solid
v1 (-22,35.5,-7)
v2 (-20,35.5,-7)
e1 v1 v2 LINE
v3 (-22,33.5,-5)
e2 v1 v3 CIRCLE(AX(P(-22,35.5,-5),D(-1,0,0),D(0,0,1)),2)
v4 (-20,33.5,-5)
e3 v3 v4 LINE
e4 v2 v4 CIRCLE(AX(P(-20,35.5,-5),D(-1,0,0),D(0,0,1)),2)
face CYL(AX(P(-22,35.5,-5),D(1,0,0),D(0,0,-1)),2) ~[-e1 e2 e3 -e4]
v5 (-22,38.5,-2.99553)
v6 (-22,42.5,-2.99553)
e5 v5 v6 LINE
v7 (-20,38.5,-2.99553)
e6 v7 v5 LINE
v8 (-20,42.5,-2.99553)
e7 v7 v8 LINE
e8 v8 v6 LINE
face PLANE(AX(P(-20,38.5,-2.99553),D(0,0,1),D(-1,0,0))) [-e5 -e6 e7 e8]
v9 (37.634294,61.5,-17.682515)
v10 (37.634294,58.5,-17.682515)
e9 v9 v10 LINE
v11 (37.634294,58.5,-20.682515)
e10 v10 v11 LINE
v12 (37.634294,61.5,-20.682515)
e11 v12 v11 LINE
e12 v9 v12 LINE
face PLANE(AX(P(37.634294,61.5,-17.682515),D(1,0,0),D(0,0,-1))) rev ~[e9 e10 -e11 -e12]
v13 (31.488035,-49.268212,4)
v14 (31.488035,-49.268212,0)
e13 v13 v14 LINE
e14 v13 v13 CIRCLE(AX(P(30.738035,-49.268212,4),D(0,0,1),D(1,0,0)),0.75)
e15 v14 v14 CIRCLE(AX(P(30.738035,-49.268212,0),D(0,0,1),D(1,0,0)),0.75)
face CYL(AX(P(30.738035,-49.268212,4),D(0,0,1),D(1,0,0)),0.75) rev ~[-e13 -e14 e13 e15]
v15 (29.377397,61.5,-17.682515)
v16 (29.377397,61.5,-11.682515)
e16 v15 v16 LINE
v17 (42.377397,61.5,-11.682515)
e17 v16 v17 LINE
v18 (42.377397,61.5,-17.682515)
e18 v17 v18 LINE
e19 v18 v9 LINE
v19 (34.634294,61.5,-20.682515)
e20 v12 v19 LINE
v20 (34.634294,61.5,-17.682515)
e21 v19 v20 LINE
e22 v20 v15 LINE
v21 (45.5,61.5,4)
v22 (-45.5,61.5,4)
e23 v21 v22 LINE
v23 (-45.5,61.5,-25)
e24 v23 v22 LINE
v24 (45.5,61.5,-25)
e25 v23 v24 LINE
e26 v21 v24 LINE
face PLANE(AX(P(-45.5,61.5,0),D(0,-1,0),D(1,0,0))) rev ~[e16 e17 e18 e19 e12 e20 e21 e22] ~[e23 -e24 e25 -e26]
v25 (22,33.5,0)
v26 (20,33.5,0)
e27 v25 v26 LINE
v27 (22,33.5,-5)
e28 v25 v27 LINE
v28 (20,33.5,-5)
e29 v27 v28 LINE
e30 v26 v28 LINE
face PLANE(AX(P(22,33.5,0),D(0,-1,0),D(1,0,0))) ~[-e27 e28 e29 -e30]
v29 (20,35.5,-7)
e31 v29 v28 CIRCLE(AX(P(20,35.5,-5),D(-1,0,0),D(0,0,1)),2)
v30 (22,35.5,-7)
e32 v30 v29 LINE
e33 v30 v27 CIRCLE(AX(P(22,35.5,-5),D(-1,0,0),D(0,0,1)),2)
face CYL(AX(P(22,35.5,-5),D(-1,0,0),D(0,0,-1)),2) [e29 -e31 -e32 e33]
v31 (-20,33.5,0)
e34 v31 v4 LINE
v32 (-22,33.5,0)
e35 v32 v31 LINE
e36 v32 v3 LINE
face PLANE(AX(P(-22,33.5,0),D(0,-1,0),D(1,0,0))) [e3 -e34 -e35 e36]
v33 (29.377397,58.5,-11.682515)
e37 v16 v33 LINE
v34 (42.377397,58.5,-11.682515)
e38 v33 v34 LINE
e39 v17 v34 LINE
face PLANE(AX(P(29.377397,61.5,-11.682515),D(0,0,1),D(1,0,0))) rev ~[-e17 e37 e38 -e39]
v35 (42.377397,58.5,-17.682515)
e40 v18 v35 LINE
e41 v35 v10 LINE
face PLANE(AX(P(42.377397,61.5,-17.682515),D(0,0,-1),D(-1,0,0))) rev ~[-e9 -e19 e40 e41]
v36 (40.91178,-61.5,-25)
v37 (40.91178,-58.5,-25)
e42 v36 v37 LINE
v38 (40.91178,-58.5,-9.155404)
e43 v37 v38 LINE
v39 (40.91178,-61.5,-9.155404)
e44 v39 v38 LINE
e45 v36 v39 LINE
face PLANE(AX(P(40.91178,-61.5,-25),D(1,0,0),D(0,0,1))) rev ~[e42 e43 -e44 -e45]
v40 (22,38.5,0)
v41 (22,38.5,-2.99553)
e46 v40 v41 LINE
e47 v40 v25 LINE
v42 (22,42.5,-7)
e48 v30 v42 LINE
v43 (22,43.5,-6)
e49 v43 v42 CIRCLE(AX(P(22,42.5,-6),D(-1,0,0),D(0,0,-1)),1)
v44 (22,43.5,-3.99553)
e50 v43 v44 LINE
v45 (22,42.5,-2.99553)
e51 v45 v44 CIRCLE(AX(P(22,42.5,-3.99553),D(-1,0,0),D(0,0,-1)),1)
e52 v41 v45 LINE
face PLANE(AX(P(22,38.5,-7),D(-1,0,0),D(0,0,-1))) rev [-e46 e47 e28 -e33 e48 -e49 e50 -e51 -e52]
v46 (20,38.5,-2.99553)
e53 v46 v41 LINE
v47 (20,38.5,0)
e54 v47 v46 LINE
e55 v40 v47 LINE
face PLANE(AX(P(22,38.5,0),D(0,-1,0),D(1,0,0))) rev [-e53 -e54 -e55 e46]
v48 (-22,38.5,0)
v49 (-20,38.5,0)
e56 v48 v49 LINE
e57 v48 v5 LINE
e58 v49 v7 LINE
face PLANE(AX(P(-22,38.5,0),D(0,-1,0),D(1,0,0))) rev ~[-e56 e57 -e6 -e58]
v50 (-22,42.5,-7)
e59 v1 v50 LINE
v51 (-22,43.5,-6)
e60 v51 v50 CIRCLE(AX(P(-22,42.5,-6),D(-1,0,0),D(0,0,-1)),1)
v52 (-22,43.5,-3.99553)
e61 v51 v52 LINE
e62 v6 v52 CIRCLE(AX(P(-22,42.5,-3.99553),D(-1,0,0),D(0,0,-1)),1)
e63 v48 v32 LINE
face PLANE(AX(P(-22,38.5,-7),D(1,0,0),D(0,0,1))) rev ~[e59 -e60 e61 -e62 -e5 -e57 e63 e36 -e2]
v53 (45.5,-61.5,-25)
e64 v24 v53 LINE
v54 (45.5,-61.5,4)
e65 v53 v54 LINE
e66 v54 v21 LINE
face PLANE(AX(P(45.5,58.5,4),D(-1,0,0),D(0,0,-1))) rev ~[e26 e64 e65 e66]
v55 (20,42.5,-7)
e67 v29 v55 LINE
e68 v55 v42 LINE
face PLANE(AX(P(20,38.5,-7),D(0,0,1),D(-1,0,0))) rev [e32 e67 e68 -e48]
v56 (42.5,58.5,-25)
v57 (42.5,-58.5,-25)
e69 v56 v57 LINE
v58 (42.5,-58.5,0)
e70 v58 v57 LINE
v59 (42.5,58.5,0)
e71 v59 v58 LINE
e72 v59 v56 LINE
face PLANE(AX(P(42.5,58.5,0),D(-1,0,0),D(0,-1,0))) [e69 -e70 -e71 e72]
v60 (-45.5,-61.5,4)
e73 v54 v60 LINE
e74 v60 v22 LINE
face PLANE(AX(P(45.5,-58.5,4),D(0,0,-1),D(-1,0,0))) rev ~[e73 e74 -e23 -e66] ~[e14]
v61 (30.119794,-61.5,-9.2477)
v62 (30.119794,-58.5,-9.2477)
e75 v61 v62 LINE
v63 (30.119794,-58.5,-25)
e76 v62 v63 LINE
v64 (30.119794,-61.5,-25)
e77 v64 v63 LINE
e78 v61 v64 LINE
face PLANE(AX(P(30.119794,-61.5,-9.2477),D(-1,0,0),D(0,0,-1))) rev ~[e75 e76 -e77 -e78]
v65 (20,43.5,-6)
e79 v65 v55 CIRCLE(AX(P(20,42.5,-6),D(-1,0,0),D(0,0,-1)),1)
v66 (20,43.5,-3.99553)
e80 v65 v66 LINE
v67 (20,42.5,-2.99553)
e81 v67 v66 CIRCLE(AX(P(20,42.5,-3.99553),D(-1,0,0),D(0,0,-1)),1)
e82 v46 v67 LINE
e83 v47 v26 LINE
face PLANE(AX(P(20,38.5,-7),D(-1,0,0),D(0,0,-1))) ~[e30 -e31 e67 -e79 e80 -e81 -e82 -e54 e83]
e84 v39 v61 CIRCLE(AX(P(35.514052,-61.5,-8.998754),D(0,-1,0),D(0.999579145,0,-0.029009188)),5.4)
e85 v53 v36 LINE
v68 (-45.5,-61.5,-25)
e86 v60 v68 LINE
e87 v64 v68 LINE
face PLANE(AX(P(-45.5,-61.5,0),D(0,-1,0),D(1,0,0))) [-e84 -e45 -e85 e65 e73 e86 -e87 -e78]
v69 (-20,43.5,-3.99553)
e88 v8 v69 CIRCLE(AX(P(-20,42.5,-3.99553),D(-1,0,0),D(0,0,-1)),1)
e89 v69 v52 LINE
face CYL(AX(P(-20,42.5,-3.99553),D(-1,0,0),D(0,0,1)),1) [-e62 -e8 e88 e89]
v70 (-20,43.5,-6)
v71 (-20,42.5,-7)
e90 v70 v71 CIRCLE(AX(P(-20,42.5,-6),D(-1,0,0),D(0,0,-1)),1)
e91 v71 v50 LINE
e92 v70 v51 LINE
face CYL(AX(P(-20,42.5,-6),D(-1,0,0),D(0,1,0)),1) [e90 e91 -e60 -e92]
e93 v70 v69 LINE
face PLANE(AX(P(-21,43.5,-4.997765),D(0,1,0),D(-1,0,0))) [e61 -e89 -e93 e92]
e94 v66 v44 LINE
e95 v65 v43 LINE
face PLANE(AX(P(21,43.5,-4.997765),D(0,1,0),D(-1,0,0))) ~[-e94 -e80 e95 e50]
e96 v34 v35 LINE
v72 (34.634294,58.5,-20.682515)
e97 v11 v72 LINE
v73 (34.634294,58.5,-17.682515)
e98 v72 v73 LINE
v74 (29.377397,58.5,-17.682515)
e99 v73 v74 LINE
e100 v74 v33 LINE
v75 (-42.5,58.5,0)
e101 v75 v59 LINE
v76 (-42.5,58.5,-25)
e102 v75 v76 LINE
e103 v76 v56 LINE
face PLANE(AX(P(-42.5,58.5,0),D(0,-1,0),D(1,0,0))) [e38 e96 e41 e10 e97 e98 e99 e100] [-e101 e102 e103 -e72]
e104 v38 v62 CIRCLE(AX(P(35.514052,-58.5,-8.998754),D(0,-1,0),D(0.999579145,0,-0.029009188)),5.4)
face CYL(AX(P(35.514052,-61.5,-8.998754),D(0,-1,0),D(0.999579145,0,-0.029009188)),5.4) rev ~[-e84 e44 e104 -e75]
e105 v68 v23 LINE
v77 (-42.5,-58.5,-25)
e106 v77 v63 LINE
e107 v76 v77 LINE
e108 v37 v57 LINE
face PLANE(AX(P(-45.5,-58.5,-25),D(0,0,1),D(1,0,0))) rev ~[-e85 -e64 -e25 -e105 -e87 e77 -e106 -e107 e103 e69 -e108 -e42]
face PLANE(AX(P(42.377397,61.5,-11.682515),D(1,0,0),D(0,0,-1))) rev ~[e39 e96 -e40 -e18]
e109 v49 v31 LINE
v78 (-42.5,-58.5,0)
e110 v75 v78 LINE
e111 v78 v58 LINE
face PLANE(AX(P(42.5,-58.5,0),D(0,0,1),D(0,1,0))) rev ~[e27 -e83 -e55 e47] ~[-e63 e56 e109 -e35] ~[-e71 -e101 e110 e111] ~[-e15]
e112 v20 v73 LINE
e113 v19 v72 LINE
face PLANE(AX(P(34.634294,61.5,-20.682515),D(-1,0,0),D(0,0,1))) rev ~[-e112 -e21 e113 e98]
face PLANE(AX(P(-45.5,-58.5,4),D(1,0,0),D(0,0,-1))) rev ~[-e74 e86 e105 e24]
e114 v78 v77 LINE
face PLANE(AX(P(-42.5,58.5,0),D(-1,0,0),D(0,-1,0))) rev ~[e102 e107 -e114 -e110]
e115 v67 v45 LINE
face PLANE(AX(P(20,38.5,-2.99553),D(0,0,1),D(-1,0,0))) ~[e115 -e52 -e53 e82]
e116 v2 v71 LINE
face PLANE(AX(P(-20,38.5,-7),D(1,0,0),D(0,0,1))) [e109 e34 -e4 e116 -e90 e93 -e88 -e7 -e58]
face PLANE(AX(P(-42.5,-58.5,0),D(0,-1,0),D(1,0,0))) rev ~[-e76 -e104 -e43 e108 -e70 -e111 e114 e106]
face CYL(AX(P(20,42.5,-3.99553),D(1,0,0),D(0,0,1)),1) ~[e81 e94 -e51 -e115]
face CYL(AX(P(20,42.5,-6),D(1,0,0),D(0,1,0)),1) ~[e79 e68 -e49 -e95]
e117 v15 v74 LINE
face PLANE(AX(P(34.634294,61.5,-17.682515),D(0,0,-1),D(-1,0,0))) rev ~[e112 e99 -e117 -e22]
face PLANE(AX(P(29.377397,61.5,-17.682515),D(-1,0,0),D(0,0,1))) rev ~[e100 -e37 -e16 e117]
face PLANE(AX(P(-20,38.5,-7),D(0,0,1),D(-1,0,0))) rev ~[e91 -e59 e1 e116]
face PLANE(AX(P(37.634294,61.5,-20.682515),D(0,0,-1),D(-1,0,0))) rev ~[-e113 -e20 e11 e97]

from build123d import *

# Parameters (mm, degrees)
F0_W      = 85
F0_H      = 117
F1_DEPTH  = 4
F2_W      = 2
F2_H      = 5
F3_DEPTH  = 7
F4_W      = 2
F4_H      = 4.0044696238
F5_DEPTH  = 5
F6_R      = 1
F7_R      = 1
F8_R      = 2
F11_W     = 117
F11_H     = 4
F12_DEPTH = 3
F10_W     = 117
F10_H     = 4
F14_DEPTH = 3
F13_W     = 85
F13_H     = 3
F13_W_2   = 3
F13_H_2   = 117
F15_DEPTH = 25
F16_DEPTH = 3
F18_DEPTH = 3
F19_R     = 0.75
F20_DEPTH = 4
F21_DEPTH = 3
F23_DEPTH = 3


# Not quite as in the source:
# - a feature names something its author has since deleted; it is built from what else it names


with BuildPart() as f1:
    # F0 (on Top) → F1 (new body)
    with BuildSketch(Plane.XY):
        Rectangle(F0_W, F0_H)
    extrude(amount=F1_DEPTH)

    # F2 (on face) → F3 (join)
    with BuildSketch(Plane(origin=(0, 0, 0), x_dir=(1, 0, 0), z_dir=(0, 0, -1))):
        with Locations((-21, -36)):
            Rectangle(F2_W, F2_H)
    extrude(amount=F3_DEPTH)

    # F4 (on face) → F5 (join)
    with BuildSketch(Plane(origin=(0, 38.5, 0), x_dir=(-1, 0, 0), z_dir=(0, 1, 0))):
        with Locations((21, -4.9977651881)):
            Rectangle(F4_W, F4_H)
    extrude(amount=F5_DEPTH)

    # F6
    f6_edges = [f1.edges().sort_by_distance(p)[0] for p in [
        (-21, 43.5, -2.99553),
    ]]
    fillet(f6_edges, radius=F6_R)

    # F7
    f7_edges = [f1.edges().sort_by_distance(p)[0] for p in [
        (-21, 43.5, -7),
    ]]
    fillet(f7_edges, radius=F7_R)

    # F8
    f8_edges = [f1.edges().sort_by_distance(p)[0] for p in [
        (-21, 33.5, -7),
    ]]
    fillet(f8_edges, radius=F8_R)


with BuildPart() as f9_1:
    # F9: instance of F1
    add(f1.part.mirror(Plane.YZ))


with BuildPart() as f1_1:
    add(f1.part)

    add(f9_1.part)  # F12 merges F9_1
    # F11 (on face) → F12 (join)
    with BuildSketch(Plane(origin=(-42.5, 0, 0), x_dir=(0, -1, 0), z_dir=(-1, 0, 0))):
        with Locations((0, 2)):
            Rectangle(F11_W, F11_H)
    extrude(amount=F12_DEPTH)

    # F10 (on face) → F14 (join)
    with BuildSketch(Plane.YZ.offset(42.5)):
        with Locations((0, 2)):
            Rectangle(F10_W, F10_H)
    extrude(amount=F14_DEPTH)

    # F13 (on face) → F15 (join)
    with BuildSketch(Plane(origin=(0, 0, 0), x_dir=(1, 0, 0), z_dir=(0, 0, -1))):
        with Locations((0, 60)):
            Rectangle(F13_W, F13_H)
        with Locations((0, -60)):
            Rectangle(F13_W, F13_H)
        with Locations((-44, 0)):
            Rectangle(F13_W_2, F13_H_2)
        with Locations((44, 0)):
            Rectangle(F13_W_2, F13_H_2)
    extrude(amount=F15_DEPTH)

    # F16 (add): a face of the model
    f16_faces = [f1_1.faces().sort_by_distance(p)[0] for p in [
        (0, 58.5, 0.9550916186),
    ]]
    extrude(f16_faces, amount=F16_DEPTH)

    # F17 (on face) → F18 (cut)
    with BuildSketch(Plane(origin=(0, 61.5, 0), x_dir=(-1, 0, 0), z_dir=(0, 1, 0))):
        Polygon((-29.3773965985, -11.6825154486), (-42.3773965985, -11.6825154486), (-42.3773965985, -17.6825154486), (-37.6342944801, -17.6825154486), (-37.6342944801, -20.6825154486), (-34.6342944801, -20.6825154486), (-34.6342944801, -17.6825154486), (-29.3773965985, -17.6825154486), align=None)
    extrude(amount=-F18_DEPTH, mode=Mode.SUBTRACT)

    # F19 (on face) → F20 (cut, through all)
    with BuildSketch(Plane.XY.offset(4)):
        with Locations((30.7380352169, -49.2682121694)):
            Circle(F19_R)
    extrude(amount=-F20_DEPTH, mode=Mode.SUBTRACT)

    # F21 (add): a face of the model
    f21_faces = [f1_1.faces().sort_by_distance(p)[0] for p in [
        (-44.5449083814, -58.5, -10.5),
    ]]
    extrude(f21_faces, amount=F21_DEPTH)

    # F22 (on face) → F23 (cut, through all)
    with BuildSketch(Plane.XZ.offset(61.5)):
        with BuildLine():
            Line((40.9117795325, -25), (40.9117795325, -9.155403553))
            ThreePointArc((40.9117795325, -9.155403553), (35.4678711158, -3.59895141), (30.1197935699, -9.2477004601))
            Line((30.1197935699, -9.2477004601), (30.1197935699, -25))
            Line((30.1197935699, -25), (40.9117795325, -25))
        make_face()
    extrude(amount=-F23_DEPTH, mode=Mode.SUBTRACT)


solid = f1_1.part
